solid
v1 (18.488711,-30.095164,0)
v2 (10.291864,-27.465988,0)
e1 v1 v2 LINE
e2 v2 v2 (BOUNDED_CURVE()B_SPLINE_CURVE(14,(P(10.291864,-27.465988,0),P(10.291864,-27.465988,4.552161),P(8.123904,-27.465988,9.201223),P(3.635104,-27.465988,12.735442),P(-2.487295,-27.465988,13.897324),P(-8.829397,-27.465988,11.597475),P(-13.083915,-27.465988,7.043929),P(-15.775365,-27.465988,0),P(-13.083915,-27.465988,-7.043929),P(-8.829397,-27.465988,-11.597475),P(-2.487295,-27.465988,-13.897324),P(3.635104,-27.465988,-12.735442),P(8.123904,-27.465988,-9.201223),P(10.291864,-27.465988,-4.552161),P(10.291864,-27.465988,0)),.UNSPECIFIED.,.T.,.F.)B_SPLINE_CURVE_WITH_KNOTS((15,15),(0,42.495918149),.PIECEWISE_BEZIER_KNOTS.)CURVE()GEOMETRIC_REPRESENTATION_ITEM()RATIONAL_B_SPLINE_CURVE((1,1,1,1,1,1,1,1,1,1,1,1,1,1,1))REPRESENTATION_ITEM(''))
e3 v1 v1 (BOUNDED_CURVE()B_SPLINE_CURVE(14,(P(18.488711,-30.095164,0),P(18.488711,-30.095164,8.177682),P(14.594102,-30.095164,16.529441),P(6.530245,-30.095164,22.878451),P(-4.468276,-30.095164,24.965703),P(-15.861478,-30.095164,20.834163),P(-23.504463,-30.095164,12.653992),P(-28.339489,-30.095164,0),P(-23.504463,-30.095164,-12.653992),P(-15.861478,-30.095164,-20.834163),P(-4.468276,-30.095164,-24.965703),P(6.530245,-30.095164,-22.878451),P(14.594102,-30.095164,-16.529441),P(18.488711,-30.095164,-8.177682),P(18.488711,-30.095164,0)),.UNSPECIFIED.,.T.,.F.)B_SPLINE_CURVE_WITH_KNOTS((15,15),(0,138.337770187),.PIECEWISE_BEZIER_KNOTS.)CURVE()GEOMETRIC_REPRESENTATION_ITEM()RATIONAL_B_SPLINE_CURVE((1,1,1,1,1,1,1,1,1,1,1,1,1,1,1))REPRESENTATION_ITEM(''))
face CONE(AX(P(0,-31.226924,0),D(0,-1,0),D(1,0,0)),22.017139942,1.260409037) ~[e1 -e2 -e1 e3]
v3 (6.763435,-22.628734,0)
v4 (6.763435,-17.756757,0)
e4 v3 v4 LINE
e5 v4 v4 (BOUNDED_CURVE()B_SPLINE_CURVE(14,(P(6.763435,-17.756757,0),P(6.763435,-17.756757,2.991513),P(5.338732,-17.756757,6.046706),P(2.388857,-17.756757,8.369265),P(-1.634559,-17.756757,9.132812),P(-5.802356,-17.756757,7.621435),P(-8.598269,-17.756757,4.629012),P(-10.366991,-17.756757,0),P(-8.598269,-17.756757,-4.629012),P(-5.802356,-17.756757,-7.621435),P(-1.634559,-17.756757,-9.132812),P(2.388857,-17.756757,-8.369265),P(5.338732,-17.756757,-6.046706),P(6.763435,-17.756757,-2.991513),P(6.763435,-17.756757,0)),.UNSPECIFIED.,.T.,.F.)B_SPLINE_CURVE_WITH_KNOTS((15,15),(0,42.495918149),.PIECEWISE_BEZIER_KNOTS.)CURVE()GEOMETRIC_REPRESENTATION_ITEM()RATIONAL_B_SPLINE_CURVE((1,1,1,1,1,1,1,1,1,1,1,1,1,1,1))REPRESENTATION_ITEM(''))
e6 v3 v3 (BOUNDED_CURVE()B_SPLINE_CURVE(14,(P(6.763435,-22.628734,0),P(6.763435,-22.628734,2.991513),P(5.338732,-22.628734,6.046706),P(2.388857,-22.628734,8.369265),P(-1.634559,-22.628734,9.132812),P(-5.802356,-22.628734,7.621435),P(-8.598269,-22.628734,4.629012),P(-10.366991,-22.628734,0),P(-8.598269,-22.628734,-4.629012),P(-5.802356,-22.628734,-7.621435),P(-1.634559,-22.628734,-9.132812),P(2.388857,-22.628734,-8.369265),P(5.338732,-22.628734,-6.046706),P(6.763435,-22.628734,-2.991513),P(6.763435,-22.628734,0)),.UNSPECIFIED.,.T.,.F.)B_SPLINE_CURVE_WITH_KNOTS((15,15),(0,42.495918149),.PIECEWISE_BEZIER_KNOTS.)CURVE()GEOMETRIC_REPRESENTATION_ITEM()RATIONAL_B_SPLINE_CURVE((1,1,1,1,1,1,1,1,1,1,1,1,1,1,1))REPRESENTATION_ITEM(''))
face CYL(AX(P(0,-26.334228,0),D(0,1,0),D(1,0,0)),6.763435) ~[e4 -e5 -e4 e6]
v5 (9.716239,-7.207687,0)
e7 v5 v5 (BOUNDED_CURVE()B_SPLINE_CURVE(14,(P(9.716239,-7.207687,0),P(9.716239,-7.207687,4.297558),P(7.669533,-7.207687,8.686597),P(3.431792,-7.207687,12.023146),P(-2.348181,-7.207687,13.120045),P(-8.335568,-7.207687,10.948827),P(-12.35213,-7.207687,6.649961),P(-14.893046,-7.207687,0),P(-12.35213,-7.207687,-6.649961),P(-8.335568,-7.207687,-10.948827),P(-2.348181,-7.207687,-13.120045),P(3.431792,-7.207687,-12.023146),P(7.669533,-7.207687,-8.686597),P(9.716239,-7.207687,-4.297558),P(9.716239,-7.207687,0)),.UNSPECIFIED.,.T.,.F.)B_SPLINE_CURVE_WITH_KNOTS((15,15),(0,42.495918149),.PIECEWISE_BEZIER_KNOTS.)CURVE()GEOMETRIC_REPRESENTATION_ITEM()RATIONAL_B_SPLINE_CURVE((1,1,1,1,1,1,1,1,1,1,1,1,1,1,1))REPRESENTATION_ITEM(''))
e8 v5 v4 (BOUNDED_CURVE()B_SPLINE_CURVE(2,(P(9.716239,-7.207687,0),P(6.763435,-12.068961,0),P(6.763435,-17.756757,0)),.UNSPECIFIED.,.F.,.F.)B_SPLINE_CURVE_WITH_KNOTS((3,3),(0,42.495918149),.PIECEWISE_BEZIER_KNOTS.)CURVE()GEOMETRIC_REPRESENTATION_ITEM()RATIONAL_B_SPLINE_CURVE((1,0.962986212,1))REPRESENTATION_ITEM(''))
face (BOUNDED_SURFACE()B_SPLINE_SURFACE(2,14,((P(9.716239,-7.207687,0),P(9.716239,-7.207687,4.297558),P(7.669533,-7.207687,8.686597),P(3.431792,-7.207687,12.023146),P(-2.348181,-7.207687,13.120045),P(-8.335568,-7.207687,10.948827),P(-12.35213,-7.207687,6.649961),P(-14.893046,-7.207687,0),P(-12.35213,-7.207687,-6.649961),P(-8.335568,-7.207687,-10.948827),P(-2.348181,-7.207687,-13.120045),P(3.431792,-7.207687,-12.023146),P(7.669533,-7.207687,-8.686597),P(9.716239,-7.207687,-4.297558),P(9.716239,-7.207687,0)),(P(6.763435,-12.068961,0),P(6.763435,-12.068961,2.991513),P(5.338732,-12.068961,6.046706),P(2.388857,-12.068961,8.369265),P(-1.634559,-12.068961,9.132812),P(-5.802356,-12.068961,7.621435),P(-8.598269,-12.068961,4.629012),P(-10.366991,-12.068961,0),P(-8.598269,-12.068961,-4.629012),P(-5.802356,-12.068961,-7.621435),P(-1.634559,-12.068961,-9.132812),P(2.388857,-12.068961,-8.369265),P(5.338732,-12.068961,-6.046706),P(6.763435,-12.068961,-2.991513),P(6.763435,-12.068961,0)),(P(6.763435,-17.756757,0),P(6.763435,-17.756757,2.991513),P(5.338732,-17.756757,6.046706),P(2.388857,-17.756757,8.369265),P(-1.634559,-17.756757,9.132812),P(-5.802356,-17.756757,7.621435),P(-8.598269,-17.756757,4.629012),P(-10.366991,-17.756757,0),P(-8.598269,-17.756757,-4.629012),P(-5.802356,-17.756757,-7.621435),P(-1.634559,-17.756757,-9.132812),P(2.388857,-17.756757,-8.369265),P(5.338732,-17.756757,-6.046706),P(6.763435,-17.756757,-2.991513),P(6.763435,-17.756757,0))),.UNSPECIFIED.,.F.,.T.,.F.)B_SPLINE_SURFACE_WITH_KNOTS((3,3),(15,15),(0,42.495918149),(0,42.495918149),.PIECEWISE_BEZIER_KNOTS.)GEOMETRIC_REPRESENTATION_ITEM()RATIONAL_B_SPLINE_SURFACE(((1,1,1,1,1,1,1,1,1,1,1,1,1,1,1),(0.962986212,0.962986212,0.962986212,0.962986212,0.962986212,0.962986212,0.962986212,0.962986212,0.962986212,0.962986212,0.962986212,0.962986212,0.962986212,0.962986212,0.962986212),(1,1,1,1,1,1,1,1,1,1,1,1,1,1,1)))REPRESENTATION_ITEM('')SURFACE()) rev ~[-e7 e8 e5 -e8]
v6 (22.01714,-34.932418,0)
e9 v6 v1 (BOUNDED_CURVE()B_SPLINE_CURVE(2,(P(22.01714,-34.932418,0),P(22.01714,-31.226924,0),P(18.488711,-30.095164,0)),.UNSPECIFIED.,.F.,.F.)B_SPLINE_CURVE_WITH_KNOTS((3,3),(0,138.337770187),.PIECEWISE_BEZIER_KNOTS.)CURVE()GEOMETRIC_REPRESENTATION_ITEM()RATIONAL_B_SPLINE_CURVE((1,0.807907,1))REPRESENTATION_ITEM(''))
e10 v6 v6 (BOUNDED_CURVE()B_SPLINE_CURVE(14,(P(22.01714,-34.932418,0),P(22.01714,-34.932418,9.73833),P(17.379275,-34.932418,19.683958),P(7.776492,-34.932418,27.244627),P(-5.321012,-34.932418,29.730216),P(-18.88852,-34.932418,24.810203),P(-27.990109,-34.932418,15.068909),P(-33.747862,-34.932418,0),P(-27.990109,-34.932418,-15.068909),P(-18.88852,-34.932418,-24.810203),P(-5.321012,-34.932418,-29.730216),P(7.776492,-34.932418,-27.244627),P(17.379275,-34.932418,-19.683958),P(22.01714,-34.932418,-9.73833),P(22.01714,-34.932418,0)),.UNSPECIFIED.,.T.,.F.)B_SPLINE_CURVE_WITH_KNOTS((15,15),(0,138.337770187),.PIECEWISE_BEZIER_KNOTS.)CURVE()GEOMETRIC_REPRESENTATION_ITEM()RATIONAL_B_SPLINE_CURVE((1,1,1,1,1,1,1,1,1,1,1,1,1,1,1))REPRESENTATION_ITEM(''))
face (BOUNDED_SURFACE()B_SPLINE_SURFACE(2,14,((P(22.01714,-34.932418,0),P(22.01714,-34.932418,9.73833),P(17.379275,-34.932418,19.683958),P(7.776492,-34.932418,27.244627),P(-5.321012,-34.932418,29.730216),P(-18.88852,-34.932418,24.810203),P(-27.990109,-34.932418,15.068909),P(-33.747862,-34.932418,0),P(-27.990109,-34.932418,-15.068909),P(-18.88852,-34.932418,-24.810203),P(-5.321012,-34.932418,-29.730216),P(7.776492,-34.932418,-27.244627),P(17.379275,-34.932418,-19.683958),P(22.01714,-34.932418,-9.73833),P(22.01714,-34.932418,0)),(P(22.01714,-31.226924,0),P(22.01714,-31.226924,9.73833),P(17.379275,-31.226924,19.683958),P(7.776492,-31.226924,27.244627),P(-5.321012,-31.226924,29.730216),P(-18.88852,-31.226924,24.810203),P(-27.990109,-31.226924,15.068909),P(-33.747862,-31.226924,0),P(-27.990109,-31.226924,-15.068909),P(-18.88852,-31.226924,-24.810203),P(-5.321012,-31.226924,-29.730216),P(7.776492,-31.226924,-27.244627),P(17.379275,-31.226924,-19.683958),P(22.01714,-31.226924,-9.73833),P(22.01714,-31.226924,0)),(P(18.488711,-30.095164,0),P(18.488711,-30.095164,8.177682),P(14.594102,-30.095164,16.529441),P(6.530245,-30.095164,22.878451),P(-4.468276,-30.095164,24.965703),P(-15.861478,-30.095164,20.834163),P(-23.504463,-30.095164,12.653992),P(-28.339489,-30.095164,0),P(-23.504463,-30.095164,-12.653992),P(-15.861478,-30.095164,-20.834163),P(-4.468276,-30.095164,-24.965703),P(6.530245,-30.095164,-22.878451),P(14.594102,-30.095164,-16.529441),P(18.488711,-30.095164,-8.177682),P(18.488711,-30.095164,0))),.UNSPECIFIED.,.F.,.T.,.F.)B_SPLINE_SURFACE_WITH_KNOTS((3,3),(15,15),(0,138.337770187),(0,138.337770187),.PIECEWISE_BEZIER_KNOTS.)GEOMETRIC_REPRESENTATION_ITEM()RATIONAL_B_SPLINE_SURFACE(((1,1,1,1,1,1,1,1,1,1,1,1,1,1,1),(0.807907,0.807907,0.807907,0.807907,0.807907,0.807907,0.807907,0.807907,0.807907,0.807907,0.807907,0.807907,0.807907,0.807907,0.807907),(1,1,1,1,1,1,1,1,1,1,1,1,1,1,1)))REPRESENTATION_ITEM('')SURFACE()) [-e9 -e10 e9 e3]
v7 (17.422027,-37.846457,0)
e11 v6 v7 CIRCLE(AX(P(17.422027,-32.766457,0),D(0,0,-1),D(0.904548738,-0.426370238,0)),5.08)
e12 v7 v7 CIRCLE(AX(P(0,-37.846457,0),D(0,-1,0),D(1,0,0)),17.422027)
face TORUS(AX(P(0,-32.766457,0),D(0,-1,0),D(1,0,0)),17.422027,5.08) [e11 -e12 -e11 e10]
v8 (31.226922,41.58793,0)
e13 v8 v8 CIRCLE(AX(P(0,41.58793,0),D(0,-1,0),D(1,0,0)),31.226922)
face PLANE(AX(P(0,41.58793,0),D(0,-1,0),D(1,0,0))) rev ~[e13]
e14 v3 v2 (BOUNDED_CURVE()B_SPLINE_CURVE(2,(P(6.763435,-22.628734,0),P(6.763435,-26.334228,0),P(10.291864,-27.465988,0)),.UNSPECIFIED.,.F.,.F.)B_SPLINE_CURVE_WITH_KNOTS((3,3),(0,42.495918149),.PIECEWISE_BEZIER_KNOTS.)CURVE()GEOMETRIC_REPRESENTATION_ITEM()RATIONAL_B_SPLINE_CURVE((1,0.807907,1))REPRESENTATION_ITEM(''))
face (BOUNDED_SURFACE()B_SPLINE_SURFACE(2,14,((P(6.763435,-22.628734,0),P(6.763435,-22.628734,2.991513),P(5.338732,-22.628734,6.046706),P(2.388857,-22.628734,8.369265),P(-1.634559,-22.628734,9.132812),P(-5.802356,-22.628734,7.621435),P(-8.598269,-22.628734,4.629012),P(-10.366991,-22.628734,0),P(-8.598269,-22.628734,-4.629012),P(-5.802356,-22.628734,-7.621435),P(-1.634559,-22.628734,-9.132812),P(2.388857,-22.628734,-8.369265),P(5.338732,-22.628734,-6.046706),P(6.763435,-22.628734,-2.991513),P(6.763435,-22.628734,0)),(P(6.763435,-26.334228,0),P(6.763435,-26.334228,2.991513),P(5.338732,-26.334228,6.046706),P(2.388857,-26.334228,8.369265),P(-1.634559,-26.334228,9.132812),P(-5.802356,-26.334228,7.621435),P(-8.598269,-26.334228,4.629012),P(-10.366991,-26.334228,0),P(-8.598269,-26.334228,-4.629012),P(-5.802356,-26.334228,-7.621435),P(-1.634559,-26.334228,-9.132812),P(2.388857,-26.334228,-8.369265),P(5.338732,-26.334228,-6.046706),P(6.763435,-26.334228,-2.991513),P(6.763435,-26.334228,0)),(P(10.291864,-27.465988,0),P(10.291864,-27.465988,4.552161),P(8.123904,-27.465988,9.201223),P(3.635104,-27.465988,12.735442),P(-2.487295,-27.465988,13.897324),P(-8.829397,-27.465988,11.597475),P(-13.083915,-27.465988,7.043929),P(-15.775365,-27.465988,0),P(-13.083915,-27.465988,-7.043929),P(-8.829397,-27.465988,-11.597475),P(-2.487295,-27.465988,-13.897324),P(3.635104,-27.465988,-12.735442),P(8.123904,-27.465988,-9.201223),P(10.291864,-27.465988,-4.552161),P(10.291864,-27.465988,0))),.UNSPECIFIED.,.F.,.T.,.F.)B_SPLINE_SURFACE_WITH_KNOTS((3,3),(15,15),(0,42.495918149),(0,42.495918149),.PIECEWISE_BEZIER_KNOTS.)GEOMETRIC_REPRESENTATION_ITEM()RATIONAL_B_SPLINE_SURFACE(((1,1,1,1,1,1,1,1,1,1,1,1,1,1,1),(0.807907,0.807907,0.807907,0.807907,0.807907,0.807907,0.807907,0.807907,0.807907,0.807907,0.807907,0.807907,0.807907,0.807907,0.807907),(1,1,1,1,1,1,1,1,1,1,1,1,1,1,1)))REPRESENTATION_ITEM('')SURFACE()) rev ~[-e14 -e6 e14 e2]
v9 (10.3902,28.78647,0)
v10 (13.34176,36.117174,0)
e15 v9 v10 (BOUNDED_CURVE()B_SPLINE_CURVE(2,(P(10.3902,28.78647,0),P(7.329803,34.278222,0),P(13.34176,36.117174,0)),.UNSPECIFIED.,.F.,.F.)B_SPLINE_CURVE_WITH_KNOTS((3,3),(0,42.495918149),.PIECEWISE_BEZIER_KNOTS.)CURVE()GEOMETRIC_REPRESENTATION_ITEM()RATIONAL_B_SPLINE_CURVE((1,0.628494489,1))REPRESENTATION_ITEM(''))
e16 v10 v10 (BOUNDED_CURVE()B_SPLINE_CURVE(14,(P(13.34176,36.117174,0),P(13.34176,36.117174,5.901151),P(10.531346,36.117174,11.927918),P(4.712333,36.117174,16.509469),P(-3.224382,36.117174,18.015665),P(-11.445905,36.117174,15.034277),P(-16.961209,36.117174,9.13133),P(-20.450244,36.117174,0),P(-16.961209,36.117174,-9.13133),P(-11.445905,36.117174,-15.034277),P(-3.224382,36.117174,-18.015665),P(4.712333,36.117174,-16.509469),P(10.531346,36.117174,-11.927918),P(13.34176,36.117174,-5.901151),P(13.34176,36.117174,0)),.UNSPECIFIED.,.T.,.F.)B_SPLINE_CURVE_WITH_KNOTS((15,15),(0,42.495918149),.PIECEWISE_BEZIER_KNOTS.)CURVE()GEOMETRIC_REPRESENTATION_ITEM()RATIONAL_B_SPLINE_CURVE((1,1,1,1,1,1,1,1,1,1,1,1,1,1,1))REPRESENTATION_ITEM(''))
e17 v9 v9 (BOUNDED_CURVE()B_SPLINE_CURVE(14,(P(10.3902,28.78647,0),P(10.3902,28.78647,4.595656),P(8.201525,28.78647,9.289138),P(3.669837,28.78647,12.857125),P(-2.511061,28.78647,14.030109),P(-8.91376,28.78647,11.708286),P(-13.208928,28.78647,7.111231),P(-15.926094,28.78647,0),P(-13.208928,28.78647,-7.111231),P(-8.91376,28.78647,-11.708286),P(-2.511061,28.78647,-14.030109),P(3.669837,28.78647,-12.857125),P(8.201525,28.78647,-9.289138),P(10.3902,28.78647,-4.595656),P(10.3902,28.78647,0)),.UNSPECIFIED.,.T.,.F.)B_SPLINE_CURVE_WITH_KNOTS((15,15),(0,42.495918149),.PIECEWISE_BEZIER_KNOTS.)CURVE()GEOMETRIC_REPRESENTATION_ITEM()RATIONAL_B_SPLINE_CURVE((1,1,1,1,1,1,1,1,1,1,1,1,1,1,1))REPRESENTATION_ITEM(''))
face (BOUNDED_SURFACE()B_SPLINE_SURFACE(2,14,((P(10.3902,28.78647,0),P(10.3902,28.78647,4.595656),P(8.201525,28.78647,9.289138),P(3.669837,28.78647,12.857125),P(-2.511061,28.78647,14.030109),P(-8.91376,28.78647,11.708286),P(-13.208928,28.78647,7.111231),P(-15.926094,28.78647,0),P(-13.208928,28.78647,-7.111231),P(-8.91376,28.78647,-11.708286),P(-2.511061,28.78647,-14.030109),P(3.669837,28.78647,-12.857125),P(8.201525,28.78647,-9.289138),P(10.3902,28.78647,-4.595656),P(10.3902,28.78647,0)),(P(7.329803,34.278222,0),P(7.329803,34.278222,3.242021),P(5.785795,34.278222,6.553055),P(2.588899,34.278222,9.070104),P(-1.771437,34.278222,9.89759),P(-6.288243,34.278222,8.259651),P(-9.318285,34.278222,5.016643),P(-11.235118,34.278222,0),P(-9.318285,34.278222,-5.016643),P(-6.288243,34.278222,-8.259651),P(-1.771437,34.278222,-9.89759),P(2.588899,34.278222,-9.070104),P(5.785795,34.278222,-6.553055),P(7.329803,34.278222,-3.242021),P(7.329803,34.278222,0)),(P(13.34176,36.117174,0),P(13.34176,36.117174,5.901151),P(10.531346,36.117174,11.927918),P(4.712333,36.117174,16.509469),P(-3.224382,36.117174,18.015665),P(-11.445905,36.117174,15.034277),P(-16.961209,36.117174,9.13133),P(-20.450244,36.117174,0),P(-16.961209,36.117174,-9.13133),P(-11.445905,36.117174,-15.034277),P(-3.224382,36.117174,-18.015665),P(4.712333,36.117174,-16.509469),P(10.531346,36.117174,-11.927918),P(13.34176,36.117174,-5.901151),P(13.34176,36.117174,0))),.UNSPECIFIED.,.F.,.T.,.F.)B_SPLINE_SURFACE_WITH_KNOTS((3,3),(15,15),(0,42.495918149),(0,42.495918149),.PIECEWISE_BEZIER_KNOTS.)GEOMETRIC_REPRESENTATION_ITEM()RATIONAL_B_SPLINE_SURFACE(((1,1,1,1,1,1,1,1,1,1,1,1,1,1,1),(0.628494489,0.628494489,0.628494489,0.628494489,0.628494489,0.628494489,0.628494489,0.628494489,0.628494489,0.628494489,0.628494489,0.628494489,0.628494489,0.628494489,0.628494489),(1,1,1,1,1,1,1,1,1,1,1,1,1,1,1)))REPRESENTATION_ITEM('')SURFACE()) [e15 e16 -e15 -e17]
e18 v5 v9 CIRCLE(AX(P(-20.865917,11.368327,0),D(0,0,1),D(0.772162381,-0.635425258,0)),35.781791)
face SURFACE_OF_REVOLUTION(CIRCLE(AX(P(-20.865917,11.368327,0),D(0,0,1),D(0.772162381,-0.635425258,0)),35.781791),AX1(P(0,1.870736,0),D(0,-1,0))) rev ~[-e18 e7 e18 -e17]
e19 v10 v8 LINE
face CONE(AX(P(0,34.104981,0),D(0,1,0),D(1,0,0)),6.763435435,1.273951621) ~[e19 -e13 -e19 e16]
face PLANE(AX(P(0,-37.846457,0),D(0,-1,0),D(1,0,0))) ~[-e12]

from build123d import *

# Parameters (mm, degrees)
F2_R = 5.08
F3_R = 5.08
F5_R = 20.32
F6_R = 5.08


# Not quite as in the source:
# - a fillet or chamfer that OpenCascade refuses, or shapes differently, is made with other operations: its cross-section is extruded or revolved along the edge and cut away or added


with BuildPart() as f1:
    # F0 (on Top) → F1 (revolve)
    with BuildSketch(Plane.XY):
        with BuildLine():
            Line((0, 41.5879301727), (0, -37.8464572132))
            Line((0, -37.8464572132), (22.0171399415, -37.8464572132))
            Line((22.0171399415, -37.8464572132), (22.0171399415, -31.2269236892))
            Line((22.0171399415, -31.2269236892), (6.7634354346, -26.3342279941))
            Line((6.7634354346, -26.3342279941), (6.7634354346, -11.3683268428))
            ThreePointArc((6.7634354346, -11.3683268428), (14.9158734859, 11.3683268428), (6.7634354346, 34.1049805284))
            Line((6.7634354346, 34.1049805284), (31.2269218266, 41.5879301727))
            Line((31.2269218266, 41.5879301727), (0, 41.5879301727))
        make_face()
    revolve(axis=Axis((0, 1.8707364798, 0), (0, -1, 0)))

    # F2
    f2_edges = [f1.edges().sort_by_distance(p)[0] for p in [
        (-22.01714, -31.226924, 0),
    ]]
    fillet(f2_edges, radius=F2_R)

    # F3
    f3_edges = [f1.edges().sort_by_distance(p)[0] for p in [
        (-6.763435, 34.104981, 0),
    ]]
    fillet(f3_edges, radius=F3_R)

    # F4: fillet of radius 5.08 on 1 edges, made by hand

    # F4_s1 → F4_t2 (revolve, cut)
    with BuildSketch(Plane.XY):
        with BuildLine():
            ThreePointArc((22.0171343212, -34.9324180223), (20.1426258452, -37.0565318577), (17.4220267302, -37.8464572132))
            Line((17.4220267302, -37.8464572132), (22.0171399415, -37.8464572132))
            Line((22.0171399415, -37.8464572132), (22.0171343212, -34.9324180223))
        make_face()
    revolve(axis=Axis((0, -37.8464572132, 0), (0, -1, 0)), mode=Mode.SUBTRACT)

    # F5
    f5_edges = [f1.edges().sort_by_distance(p)[0] for p in [
        (-6.763435, -11.368327, 0),
    ]]
    fillet(f5_edges, radius=F5_R)

    # F6
    f6_edges = [f1.edges().sort_by_distance(p)[0] for p in [
        (-6.763435, -26.334228, 0),
    ]]
    fillet(f6_edges, radius=F6_R)


solid = f1.part
